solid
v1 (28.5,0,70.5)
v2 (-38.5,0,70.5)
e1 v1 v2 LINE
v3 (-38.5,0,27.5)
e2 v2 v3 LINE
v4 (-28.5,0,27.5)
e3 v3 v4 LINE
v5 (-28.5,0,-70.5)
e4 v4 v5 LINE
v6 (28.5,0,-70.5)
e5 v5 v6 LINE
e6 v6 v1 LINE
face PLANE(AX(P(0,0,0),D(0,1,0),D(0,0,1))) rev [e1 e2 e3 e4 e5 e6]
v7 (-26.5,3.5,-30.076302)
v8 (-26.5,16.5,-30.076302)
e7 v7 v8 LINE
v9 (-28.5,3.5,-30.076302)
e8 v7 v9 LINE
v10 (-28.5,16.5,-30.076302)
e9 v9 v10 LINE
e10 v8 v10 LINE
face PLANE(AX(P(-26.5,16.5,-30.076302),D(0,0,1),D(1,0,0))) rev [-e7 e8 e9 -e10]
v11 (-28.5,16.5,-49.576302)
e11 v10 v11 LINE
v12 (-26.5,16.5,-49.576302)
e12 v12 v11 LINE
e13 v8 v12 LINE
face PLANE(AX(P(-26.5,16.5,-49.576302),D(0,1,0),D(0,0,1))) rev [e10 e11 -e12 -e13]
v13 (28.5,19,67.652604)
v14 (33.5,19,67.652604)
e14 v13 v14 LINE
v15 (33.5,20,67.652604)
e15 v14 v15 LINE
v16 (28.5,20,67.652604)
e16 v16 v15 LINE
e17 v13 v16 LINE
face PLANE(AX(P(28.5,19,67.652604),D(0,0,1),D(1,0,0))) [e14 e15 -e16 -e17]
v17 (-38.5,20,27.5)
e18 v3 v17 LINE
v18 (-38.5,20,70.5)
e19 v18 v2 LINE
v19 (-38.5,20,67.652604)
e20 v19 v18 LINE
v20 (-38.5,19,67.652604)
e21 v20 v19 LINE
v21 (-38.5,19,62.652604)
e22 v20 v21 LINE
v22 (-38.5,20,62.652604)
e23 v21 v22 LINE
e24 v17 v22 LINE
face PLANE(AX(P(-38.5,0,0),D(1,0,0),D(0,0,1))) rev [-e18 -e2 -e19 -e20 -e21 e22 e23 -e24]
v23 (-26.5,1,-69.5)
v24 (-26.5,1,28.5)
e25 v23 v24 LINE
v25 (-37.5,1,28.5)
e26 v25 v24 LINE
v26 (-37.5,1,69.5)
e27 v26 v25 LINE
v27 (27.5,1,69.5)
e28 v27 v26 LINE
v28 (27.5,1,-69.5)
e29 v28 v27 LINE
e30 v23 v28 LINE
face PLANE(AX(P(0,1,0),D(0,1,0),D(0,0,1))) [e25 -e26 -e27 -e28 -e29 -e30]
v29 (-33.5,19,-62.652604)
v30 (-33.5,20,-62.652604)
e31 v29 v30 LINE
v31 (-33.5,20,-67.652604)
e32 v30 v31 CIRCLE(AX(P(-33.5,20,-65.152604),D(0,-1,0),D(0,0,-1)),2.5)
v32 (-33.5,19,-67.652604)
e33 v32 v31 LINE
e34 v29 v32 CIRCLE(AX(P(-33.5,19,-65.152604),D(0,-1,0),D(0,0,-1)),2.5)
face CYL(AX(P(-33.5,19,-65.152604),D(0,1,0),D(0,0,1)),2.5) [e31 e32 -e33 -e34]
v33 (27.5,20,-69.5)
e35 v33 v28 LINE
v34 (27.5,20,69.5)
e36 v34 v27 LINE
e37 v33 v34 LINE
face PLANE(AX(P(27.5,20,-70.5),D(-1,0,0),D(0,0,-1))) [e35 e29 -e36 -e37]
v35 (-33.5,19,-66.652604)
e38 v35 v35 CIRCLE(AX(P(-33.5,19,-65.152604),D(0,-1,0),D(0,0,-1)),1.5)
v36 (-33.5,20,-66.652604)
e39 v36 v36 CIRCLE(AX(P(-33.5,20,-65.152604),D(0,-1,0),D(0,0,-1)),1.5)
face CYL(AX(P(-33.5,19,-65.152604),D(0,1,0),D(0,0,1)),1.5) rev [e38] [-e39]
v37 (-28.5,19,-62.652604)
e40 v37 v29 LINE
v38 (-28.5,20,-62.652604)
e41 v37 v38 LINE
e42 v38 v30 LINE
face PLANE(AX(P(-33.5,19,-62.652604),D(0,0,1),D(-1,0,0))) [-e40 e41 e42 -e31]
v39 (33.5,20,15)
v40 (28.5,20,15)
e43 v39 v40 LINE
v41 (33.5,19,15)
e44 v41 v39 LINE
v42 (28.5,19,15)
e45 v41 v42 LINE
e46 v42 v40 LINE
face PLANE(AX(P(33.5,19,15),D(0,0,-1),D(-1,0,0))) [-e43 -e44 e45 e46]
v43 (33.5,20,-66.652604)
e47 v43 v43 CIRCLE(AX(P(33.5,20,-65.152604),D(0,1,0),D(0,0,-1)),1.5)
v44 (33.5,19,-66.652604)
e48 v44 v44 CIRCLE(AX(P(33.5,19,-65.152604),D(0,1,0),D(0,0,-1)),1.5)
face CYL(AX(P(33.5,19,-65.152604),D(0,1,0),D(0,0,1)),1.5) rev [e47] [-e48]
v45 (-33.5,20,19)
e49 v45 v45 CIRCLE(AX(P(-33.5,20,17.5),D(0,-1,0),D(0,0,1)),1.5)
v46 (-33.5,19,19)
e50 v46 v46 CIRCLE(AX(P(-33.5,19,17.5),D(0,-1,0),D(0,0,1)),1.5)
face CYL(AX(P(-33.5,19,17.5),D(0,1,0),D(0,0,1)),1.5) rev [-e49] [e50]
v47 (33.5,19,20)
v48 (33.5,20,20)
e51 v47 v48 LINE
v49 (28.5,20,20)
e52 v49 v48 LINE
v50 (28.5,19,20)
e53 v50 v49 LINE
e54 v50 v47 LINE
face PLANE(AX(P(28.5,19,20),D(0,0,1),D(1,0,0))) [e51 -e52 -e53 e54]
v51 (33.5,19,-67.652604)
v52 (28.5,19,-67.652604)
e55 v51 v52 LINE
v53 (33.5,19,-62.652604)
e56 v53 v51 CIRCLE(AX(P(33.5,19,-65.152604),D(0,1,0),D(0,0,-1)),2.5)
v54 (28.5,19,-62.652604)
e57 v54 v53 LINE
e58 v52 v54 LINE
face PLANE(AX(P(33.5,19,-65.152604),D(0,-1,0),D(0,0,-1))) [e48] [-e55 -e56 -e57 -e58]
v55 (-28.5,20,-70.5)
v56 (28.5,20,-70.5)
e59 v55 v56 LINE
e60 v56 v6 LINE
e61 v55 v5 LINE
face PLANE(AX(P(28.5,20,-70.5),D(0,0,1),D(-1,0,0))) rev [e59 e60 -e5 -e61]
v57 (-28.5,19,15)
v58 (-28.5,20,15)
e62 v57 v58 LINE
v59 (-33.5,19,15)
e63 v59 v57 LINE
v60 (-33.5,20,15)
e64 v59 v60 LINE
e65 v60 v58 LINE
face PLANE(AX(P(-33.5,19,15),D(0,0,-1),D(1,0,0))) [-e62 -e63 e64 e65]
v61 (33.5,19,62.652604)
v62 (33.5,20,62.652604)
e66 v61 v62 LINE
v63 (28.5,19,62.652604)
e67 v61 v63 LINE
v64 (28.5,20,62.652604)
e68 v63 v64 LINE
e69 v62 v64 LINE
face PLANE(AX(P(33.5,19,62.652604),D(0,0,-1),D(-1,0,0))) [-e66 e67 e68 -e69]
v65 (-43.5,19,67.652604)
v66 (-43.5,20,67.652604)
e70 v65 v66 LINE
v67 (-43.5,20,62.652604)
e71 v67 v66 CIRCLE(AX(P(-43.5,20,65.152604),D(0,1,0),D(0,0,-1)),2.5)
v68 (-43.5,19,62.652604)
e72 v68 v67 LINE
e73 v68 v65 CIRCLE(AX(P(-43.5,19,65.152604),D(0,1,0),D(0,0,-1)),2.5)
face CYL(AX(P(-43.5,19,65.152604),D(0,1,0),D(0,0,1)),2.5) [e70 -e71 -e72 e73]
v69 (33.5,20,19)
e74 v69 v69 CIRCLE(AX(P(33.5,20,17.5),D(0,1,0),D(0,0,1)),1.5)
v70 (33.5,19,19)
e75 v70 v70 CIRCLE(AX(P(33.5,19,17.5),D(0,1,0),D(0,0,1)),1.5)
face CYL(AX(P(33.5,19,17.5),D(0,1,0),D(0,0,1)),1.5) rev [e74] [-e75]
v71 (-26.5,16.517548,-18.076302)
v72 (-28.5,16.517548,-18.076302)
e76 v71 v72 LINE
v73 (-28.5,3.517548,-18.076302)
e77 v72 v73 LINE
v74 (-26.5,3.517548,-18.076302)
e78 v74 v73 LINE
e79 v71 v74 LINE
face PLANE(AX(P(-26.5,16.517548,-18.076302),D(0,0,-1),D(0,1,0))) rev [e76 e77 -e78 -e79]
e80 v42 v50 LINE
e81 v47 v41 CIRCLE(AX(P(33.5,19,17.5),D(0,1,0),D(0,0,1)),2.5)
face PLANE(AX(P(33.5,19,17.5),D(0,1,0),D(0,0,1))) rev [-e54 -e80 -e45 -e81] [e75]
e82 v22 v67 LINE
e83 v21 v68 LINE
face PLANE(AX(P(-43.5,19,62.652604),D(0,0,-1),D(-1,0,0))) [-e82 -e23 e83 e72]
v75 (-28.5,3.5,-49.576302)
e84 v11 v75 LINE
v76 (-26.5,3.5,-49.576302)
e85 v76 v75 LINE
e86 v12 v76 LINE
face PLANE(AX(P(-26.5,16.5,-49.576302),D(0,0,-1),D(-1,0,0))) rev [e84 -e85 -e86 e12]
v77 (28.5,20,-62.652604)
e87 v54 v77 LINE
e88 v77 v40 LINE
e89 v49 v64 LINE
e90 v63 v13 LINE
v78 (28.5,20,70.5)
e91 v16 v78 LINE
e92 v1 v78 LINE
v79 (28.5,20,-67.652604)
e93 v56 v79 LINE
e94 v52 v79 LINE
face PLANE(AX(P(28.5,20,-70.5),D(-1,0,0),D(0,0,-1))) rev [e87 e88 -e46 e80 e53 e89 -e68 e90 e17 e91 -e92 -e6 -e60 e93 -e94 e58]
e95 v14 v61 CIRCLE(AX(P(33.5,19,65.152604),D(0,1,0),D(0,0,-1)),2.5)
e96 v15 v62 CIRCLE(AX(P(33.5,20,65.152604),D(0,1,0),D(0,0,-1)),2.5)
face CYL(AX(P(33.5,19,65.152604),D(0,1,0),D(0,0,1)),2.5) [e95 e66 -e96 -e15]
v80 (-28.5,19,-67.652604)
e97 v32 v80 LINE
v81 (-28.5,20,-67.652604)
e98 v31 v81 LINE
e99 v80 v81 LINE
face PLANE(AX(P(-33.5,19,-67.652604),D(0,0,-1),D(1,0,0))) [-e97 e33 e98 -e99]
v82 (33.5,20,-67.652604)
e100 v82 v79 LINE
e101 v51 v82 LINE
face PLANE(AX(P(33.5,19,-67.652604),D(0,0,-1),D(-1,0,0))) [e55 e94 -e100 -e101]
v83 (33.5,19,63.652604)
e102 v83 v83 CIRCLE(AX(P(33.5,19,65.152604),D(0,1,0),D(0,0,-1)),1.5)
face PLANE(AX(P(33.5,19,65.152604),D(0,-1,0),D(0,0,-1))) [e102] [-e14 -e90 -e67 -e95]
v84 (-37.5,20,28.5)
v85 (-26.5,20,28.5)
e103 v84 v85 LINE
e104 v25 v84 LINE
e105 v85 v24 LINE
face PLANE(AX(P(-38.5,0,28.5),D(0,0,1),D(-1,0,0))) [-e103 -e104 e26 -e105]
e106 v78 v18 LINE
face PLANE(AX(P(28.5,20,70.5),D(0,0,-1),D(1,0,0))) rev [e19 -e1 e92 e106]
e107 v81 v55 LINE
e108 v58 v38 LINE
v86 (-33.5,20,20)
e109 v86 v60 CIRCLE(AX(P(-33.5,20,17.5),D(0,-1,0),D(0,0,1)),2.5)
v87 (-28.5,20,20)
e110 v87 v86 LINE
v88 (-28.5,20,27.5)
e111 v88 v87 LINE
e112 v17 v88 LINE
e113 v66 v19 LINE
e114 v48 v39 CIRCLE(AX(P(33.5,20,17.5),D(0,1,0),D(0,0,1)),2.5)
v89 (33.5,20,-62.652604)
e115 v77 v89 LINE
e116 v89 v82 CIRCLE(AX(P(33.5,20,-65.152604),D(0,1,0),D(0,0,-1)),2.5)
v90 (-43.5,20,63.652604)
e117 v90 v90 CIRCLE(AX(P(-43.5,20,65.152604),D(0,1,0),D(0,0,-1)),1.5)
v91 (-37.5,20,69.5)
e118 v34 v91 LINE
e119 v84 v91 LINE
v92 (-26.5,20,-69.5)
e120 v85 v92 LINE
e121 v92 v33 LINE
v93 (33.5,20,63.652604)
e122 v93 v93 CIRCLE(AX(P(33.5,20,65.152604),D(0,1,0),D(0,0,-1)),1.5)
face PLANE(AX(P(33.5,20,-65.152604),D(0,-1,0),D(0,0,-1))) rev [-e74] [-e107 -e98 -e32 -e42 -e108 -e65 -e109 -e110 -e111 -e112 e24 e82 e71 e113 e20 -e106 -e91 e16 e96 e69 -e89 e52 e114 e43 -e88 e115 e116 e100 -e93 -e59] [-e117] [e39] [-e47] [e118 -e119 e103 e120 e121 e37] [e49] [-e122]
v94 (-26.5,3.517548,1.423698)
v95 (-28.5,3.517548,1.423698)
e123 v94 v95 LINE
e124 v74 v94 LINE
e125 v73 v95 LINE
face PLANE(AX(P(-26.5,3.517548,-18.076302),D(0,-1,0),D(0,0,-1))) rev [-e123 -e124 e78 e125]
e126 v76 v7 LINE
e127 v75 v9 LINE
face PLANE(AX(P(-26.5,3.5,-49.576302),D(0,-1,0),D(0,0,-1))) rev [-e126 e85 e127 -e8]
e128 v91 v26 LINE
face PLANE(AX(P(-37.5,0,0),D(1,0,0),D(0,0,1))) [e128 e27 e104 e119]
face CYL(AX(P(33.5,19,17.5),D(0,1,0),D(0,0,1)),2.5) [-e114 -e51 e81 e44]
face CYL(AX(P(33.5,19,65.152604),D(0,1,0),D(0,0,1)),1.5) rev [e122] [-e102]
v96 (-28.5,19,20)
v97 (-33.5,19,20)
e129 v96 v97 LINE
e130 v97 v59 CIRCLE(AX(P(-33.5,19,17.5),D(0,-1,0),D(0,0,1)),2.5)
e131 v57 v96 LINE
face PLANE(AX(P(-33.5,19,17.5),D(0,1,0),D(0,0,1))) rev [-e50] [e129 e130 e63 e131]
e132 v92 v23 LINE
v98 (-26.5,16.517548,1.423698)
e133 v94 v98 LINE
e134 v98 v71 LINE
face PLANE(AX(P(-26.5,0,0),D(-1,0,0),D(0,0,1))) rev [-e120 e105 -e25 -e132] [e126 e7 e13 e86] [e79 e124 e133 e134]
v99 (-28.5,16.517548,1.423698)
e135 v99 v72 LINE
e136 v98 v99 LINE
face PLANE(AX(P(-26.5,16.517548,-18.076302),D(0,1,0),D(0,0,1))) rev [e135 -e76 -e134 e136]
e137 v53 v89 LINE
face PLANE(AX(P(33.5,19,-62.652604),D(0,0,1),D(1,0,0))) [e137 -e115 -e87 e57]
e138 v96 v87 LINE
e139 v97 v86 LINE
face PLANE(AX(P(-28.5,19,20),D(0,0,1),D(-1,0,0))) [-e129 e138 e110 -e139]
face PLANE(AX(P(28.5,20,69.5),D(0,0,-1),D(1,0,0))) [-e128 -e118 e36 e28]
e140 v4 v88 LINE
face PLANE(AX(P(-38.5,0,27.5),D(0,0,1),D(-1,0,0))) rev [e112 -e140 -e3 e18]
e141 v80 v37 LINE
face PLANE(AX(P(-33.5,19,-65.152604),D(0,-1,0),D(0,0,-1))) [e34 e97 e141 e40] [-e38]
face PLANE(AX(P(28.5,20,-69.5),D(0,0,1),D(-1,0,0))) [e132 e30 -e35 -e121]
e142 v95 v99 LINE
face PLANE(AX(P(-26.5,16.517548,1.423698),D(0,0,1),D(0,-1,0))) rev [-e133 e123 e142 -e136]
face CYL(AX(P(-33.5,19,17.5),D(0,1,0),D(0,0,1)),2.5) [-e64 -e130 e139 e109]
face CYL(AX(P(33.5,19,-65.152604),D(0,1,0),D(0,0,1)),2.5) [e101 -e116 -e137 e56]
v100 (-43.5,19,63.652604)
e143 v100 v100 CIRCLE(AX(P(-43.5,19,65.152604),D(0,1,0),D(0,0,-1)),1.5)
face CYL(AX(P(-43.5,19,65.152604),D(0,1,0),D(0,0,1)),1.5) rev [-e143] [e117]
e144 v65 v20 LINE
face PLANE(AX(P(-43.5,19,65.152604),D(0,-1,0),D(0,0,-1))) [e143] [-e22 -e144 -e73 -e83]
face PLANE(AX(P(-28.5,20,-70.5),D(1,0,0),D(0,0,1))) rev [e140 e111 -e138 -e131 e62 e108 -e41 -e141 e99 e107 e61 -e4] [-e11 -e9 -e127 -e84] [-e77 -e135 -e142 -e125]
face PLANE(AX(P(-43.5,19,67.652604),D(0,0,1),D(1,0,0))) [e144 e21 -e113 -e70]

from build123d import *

# Parameters (mm, degrees)
SKETCH2_W               = 57
SKETCH2_H               = 141
BOSS_EXTRUDE1_DEPTH     = 20
SKETCH3_R               = 1.5
BOSS_EXTRUDE3_DEPTH     = 1
BOSS_EXTRUDE3_2_DEPTH   = 1
BOSS_EXTRUDE3_3_DEPTH   = 1
SKETCH4_W               = 43
SKETCH4_H               = 20
BOSS_EXTRUDE4_DEPTH     = 10
MIRROR1_START           = 19
MIRROR1_OUTLINE_R       = 1.5
MIRROR1_DEPTH           = 1
SHELL3_START            = -27.5
SHELL3_OUTLINE_W        = 19
SHELL3_OUTLINE_H        = 139
SHELL3_DEPTH            = 55
SHELL3_START_2          = 27.5
SHELL3_2_OUTLINE_W      = 19
SHELL3_2_OUTLINE_H      = 41
SHELL3_2_DEPTH          = 10
SKETCH10_R              = 1.5
BOSS_EXTRUDE5_DEPTH     = 1
MIRROR2_OUTLINE_W       = 1
MIRROR2_OUTLINE_H       = 41
MIRROR2_DEPTH           = 20
MIRROR2_2_DEPTH         = 1
MIRROR2_START           = 19
MIRROR2_3_OUTLINE_R     = 1.5
MIRROR2_3_DEPTH         = 1
SKETCH17_W              = 98
SKETCH17_H              = 20
BOSS_EXTRUDE7_DEPTH     = 2
CUT_EXTRUDE1_DEPTH      = 87.297450716
CUT_EXTRUDE1_DEPTH_BACK = 87.297450716
SKETCH11_W              = 45.81490068
SKETCH11_H              = 58.670112651
SKETCH13_W              = 18.731668524
SKETCH13_H              = 41
CUT_EXTRUDE15_DEPTH     = 87.297450716
SKETCH14_W              = 19.5
SKETCH14_H              = 13
CUT_EXTRUDE16_DEPTH     = 2
SKETCH15_R              = 1.5
BOSS_EXTRUDE6_DEPTH     = 1
SKETCH18_W              = 1
SKETCH18_H              = 19
BOSS_EXTRUDE8_DEPTH     = 1


# Read off the part's stored shape, not the designer's step: Mirror1, Shell3, Mirror2
with BuildPart() as part:
    # Sketch2 → Boss-Extrude1 (new body)
    with BuildSketch(Plane(origin=(0, 0, 0), x_dir=(1, 0, 0), z_dir=(0, 1, 0))):
        Rectangle(SKETCH2_W, SKETCH2_H)
    extrude(amount=BOSS_EXTRUDE1_DEPTH)

    # Sketch4 → Boss-Extrude4 (add)
    with BuildSketch(Plane(origin=(28.5, 0, 0), x_dir=(0, 0, -1), z_dir=(1, 0, 0))):
        with Locations((-49, 10)):
            Rectangle(SKETCH4_W, SKETCH4_H)
    extrude(amount=BOSS_EXTRUDE4_DEPTH)

    # Mirror1 outline → Mirror1 (add)
    with BuildSketch(Plane(origin=(0, 0, 0), x_dir=(1, 0, 0), z_dir=(0, 1, 0)).offset(MIRROR1_START)):
        with BuildLine():
            ThreePointArc((43.5, -67.652604127), (46, -65.152604127), (43.5, -62.652604127))
            Line((43.5, -62.652604127), (38.5, -62.652604127))
            Line((38.5, -62.652604127), (38.5, -67.652604127))
            Line((38.5, -67.652604127), (43.5, -67.652604127))
        make_face()
        with Locations((43.5, -65.152604127)):
            Circle(MIRROR1_OUTLINE_R, mode=Mode.SUBTRACT)
    extrude(amount=MIRROR1_DEPTH)

    # Shell3 outline → Shell3 (cut)
    with BuildSketch(Plane.YZ.offset(SHELL3_START)):
        with Locations((10.5, 0)):
            Rectangle(SHELL3_OUTLINE_W, SHELL3_OUTLINE_H)
    extrude(amount=SHELL3_DEPTH, mode=Mode.SUBTRACT)

    # Shell3 2 outline → Shell3 2 (cut)
    with BuildSketch(Plane.YZ.offset(SHELL3_START_2)):
        with Locations((10.5, 49)):
            Rectangle(SHELL3_2_OUTLINE_W, SHELL3_2_OUTLINE_H)
    extrude(amount=SHELL3_2_DEPTH, mode=Mode.SUBTRACT)

    # Sketch10 → Boss-Extrude5 (add)
    with BuildSketch(Plane(origin=(0, 20, 0), x_dir=(1, 0, 0), z_dir=(0, 1, 0))):
        with BuildLine():
            Line((33.5, -15), (28.5, -15))
            Line((28.5, -15), (28.5, -20))
            Line((28.5, -20), (33.5, -20))
            ThreePointArc((33.5, -20), (36, -17.5), (33.5, -15))
        make_face()
        with Locations(Location((33.5, -17.5, 0), (0, 0, 270))):
            Circle(SKETCH10_R, mode=Mode.SUBTRACT)
    extrude(amount=-BOSS_EXTRUDE5_DEPTH)


with BuildPart() as body_2:
    # Sketch3 → Boss-Extrude3 (new body)
    with BuildSketch(Plane(origin=(0, 20, 0), x_dir=(1, 0, 0), z_dir=(0, 1, 0))):
        with BuildLine():
            Line((-33.5, 67.652604127), (-28.5, 67.652604127))
            Line((-28.5, 67.652604127), (-28.5, 62.652604127))
            Line((-28.5, 62.652604127), (-33.5, 62.652604127))
            ThreePointArc((-33.5, 62.652604127), (-36, 65.152604127), (-33.5, 67.652604127))
        make_face()
        with Locations(Location((-33.5, 65.152604127, 0), (0, 0, 270))):
            Circle(SKETCH3_R, mode=Mode.SUBTRACT)
    extrude(amount=-BOSS_EXTRUDE3_DEPTH)



with BuildPart() as body_3:
    # Sketch3 → Boss-Extrude3 2 (new body)
    with BuildSketch(Plane(origin=(0, 20, 0), x_dir=(1, 0, 0), z_dir=(0, 1, 0))):
        with BuildLine():
            Line((-28.5, -67.652604127), (-28.5, -62.652604127))
            Line((-28.5, -62.652604127), (-33.5, -62.652604127))
            ThreePointArc((-33.5, -62.652604127), (-36, -65.152604127), (-33.5, -67.652604127))
            Line((-33.5, -67.652604127), (-28.5, -67.652604127))
        make_face()
        with Locations(Location((-33.5, -65.152604127, 0), (0, 0, 90))):
            Circle(SKETCH3_R, mode=Mode.SUBTRACT)
    extrude(amount=-BOSS_EXTRUDE3_2_DEPTH)


with BuildPart() as body_4:
    # Sketch3 → Boss-Extrude3 3 (new body)
    with BuildSketch(Plane(origin=(0, 20, 0), x_dir=(1, 0, 0), z_dir=(0, 1, 0))):
        with BuildLine():
            Line((28.5, 67.652604127), (28.5, 62.652604127))
            Line((28.5, 62.652604127), (33.5, 62.652604127))
            ThreePointArc((33.5, 62.652604127), (36, 65.152604127), (33.5, 67.652604127))
            Line((33.5, 67.652604127), (28.5, 67.652604127))
        make_face()
        with Locations(Location((33.5, 65.152604127, 0), (0, 0, 90))):
            Circle(SKETCH3_R, mode=Mode.SUBTRACT)
    extrude(amount=-BOSS_EXTRUDE3_3_DEPTH)


with BuildPart() as body_2_1:
    add(body_2.part)

    add(body_4.part)  # Mirror2 merges body 4

    add(part.part)  # Mirror2 merges part
    # Mirror2 outline → Mirror2 (add)
    with BuildSketch(Plane(origin=(0, 0, 0), x_dir=(1, 0, 0), z_dir=(0, 1, 0))):
        with Locations((28, -49)):
            Rectangle(MIRROR2_OUTLINE_W, MIRROR2_OUTLINE_H)
        Polygon((-28.5, -70.5), (-28.5, -69.5), (-37.5, -69.5), (-37.5, -28.5), (-28.5, -28.5), (-28.5, -27.5), (-38.5, -27.5), (-38.5, -70.5), align=None)
    extrude(amount=MIRROR2_DEPTH)

    # Mirror2 2 outline → Mirror2 2 (add)
    with BuildSketch(Plane(origin=(0, 0, 0), x_dir=(1, 0, 0), z_dir=(0, 1, 0))):
        Polygon((-37.5, -69.5), (-28.5, -69.5), (-28.5, -67.652604127), (-28.5, -62.652604127), (-28.5, -28.5), (-37.5, -28.5), align=None)
    extrude(amount=MIRROR2_2_DEPTH)

    # Mirror2 3 outline → Mirror2 3 (add)
    # profile 1 of 2: a face of its own
    with BuildSketch(Plane(origin=(0, 0, 0), x_dir=(1, 0, 0), z_dir=(0, 1, 0)).offset(MIRROR2_START)):
        with BuildLine():
            Line((-33.5, -20), (-28.5, -20))
            Line((-28.5, -20), (-28.5, -15))
            Line((-28.5, -15), (-33.5, -15))
            ThreePointArc((-33.5, -15), (-36, -17.5), (-33.5, -20))
        make_face()
        with Locations((-33.5, -17.5)):
            Circle(MIRROR2_3_OUTLINE_R, mode=Mode.SUBTRACT)
    # profile 2 of 2: a face of its own
    with BuildSketch(Plane(origin=(0, 0, 0), x_dir=(1, 0, 0), z_dir=(0, 1, 0)).offset(MIRROR2_START)):
        with BuildLine():
            Line((-43.5, -67.652604127), (-38.5, -67.652604127))
            Line((-38.5, -67.652604127), (-38.5, -62.652604127))
            Line((-38.5, -62.652604127), (-43.5, -62.652604127))
            ThreePointArc((-43.5, -62.652604127), (-46, -65.152604127), (-43.5, -67.652604127))
        make_face()
        with Locations((-43.5, -65.152604127)):
            Circle(MIRROR2_3_OUTLINE_R, mode=Mode.SUBTRACT)
    extrude(amount=MIRROR2_3_DEPTH)

    # Sketch17 → Boss-Extrude7 (add)
    with BuildSketch(Plane.ZY.offset(28.5)):
        with Locations((-21.5, 10)):
            Rectangle(SKETCH17_W, SKETCH17_H)
    extrude(amount=-BOSS_EXTRUDE7_DEPTH)

    # Sketch11 → Cut-Extrude1 (cut, two sides: drawn at the far end of the back side and taken through both)
    with BuildSketch(Plane(origin=(0, 1, 0), x_dir=(1, 0, 0), z_dir=(0, 1, 0)).offset(-CUT_EXTRUDE1_DEPTH_BACK)):
        with Locations((51.40745034, -56.835056326)):
            Rectangle(SKETCH11_W, SKETCH11_H)
    extrude(amount=CUT_EXTRUDE1_DEPTH + CUT_EXTRUDE1_DEPTH_BACK, mode=Mode.SUBTRACT)


with BuildPart() as cut_extrude15_tool:
    # Sketch13 → Cut-Extrude15 (new, through all)
    with BuildSketch(Plane(origin=(0, 1, 0), x_dir=(1, 0, 0), z_dir=(0, 1, 0))):
        with Locations((-28.134165738, -49)):
            Rectangle(SKETCH13_W, SKETCH13_H)
    extrude(amount=CUT_EXTRUDE15_DEPTH)


with BuildPart() as body_2_2:
    add(body_2_1.part)

    # Cut-Extrude15: cut by cut_extrude15_tool
    add(cut_extrude15_tool.part, mode=Mode.SUBTRACT)

    # Sketch14 → Cut-Extrude16 (cut)
    with BuildSketch(Plane.ZY.offset(28.5)):
        with Locations((-39.826302064, 10)):
            Rectangle(SKETCH14_W, SKETCH14_H)
        with Locations((-8.326302064, 10.017547542)):
            Rectangle(SKETCH14_W, SKETCH14_H)
    extrude(amount=-CUT_EXTRUDE16_DEPTH, mode=Mode.SUBTRACT)

    # Sketch15 → Boss-Extrude6 (add)
    with BuildSketch(Plane(origin=(0, 20, 0), x_dir=(1, 0, 0), z_dir=(0, 1, 0))):
        with BuildLine():
            Line((28.5, -67.652604127), (33.5, -67.652604127))
            ThreePointArc((33.5, -67.652604127), (36, -65.152604127), (33.5, -62.652604127))
            Line((33.5, -62.652604127), (28.5, -62.652604127))
            Line((28.5, -62.652604127), (28.5, -67.652604127))
        make_face()
        with Locations(Location((33.5, -65.152604127, 0), (0, 0, 90))):
            Circle(SKETCH15_R, mode=Mode.SUBTRACT)
    extrude(amount=-BOSS_EXTRUDE6_DEPTH)

    # Sketch18 → Boss-Extrude8 (add)
    with BuildSketch(Plane(origin=(-27.5, 0, 0), x_dir=(0, 0, -1), z_dir=(1, 0, 0))):
        with Locations((-28, 10.5)):
            Rectangle(SKETCH18_W, SKETCH18_H)
    extrude(amount=BOSS_EXTRUDE8_DEPTH)


with BuildPart() as body_3_1:
    add(body_3.part)

    # Cut-Extrude15: cut by cut_extrude15_tool
    add(cut_extrude15_tool.part, mode=Mode.SUBTRACT)


solid = body_2_2.part
